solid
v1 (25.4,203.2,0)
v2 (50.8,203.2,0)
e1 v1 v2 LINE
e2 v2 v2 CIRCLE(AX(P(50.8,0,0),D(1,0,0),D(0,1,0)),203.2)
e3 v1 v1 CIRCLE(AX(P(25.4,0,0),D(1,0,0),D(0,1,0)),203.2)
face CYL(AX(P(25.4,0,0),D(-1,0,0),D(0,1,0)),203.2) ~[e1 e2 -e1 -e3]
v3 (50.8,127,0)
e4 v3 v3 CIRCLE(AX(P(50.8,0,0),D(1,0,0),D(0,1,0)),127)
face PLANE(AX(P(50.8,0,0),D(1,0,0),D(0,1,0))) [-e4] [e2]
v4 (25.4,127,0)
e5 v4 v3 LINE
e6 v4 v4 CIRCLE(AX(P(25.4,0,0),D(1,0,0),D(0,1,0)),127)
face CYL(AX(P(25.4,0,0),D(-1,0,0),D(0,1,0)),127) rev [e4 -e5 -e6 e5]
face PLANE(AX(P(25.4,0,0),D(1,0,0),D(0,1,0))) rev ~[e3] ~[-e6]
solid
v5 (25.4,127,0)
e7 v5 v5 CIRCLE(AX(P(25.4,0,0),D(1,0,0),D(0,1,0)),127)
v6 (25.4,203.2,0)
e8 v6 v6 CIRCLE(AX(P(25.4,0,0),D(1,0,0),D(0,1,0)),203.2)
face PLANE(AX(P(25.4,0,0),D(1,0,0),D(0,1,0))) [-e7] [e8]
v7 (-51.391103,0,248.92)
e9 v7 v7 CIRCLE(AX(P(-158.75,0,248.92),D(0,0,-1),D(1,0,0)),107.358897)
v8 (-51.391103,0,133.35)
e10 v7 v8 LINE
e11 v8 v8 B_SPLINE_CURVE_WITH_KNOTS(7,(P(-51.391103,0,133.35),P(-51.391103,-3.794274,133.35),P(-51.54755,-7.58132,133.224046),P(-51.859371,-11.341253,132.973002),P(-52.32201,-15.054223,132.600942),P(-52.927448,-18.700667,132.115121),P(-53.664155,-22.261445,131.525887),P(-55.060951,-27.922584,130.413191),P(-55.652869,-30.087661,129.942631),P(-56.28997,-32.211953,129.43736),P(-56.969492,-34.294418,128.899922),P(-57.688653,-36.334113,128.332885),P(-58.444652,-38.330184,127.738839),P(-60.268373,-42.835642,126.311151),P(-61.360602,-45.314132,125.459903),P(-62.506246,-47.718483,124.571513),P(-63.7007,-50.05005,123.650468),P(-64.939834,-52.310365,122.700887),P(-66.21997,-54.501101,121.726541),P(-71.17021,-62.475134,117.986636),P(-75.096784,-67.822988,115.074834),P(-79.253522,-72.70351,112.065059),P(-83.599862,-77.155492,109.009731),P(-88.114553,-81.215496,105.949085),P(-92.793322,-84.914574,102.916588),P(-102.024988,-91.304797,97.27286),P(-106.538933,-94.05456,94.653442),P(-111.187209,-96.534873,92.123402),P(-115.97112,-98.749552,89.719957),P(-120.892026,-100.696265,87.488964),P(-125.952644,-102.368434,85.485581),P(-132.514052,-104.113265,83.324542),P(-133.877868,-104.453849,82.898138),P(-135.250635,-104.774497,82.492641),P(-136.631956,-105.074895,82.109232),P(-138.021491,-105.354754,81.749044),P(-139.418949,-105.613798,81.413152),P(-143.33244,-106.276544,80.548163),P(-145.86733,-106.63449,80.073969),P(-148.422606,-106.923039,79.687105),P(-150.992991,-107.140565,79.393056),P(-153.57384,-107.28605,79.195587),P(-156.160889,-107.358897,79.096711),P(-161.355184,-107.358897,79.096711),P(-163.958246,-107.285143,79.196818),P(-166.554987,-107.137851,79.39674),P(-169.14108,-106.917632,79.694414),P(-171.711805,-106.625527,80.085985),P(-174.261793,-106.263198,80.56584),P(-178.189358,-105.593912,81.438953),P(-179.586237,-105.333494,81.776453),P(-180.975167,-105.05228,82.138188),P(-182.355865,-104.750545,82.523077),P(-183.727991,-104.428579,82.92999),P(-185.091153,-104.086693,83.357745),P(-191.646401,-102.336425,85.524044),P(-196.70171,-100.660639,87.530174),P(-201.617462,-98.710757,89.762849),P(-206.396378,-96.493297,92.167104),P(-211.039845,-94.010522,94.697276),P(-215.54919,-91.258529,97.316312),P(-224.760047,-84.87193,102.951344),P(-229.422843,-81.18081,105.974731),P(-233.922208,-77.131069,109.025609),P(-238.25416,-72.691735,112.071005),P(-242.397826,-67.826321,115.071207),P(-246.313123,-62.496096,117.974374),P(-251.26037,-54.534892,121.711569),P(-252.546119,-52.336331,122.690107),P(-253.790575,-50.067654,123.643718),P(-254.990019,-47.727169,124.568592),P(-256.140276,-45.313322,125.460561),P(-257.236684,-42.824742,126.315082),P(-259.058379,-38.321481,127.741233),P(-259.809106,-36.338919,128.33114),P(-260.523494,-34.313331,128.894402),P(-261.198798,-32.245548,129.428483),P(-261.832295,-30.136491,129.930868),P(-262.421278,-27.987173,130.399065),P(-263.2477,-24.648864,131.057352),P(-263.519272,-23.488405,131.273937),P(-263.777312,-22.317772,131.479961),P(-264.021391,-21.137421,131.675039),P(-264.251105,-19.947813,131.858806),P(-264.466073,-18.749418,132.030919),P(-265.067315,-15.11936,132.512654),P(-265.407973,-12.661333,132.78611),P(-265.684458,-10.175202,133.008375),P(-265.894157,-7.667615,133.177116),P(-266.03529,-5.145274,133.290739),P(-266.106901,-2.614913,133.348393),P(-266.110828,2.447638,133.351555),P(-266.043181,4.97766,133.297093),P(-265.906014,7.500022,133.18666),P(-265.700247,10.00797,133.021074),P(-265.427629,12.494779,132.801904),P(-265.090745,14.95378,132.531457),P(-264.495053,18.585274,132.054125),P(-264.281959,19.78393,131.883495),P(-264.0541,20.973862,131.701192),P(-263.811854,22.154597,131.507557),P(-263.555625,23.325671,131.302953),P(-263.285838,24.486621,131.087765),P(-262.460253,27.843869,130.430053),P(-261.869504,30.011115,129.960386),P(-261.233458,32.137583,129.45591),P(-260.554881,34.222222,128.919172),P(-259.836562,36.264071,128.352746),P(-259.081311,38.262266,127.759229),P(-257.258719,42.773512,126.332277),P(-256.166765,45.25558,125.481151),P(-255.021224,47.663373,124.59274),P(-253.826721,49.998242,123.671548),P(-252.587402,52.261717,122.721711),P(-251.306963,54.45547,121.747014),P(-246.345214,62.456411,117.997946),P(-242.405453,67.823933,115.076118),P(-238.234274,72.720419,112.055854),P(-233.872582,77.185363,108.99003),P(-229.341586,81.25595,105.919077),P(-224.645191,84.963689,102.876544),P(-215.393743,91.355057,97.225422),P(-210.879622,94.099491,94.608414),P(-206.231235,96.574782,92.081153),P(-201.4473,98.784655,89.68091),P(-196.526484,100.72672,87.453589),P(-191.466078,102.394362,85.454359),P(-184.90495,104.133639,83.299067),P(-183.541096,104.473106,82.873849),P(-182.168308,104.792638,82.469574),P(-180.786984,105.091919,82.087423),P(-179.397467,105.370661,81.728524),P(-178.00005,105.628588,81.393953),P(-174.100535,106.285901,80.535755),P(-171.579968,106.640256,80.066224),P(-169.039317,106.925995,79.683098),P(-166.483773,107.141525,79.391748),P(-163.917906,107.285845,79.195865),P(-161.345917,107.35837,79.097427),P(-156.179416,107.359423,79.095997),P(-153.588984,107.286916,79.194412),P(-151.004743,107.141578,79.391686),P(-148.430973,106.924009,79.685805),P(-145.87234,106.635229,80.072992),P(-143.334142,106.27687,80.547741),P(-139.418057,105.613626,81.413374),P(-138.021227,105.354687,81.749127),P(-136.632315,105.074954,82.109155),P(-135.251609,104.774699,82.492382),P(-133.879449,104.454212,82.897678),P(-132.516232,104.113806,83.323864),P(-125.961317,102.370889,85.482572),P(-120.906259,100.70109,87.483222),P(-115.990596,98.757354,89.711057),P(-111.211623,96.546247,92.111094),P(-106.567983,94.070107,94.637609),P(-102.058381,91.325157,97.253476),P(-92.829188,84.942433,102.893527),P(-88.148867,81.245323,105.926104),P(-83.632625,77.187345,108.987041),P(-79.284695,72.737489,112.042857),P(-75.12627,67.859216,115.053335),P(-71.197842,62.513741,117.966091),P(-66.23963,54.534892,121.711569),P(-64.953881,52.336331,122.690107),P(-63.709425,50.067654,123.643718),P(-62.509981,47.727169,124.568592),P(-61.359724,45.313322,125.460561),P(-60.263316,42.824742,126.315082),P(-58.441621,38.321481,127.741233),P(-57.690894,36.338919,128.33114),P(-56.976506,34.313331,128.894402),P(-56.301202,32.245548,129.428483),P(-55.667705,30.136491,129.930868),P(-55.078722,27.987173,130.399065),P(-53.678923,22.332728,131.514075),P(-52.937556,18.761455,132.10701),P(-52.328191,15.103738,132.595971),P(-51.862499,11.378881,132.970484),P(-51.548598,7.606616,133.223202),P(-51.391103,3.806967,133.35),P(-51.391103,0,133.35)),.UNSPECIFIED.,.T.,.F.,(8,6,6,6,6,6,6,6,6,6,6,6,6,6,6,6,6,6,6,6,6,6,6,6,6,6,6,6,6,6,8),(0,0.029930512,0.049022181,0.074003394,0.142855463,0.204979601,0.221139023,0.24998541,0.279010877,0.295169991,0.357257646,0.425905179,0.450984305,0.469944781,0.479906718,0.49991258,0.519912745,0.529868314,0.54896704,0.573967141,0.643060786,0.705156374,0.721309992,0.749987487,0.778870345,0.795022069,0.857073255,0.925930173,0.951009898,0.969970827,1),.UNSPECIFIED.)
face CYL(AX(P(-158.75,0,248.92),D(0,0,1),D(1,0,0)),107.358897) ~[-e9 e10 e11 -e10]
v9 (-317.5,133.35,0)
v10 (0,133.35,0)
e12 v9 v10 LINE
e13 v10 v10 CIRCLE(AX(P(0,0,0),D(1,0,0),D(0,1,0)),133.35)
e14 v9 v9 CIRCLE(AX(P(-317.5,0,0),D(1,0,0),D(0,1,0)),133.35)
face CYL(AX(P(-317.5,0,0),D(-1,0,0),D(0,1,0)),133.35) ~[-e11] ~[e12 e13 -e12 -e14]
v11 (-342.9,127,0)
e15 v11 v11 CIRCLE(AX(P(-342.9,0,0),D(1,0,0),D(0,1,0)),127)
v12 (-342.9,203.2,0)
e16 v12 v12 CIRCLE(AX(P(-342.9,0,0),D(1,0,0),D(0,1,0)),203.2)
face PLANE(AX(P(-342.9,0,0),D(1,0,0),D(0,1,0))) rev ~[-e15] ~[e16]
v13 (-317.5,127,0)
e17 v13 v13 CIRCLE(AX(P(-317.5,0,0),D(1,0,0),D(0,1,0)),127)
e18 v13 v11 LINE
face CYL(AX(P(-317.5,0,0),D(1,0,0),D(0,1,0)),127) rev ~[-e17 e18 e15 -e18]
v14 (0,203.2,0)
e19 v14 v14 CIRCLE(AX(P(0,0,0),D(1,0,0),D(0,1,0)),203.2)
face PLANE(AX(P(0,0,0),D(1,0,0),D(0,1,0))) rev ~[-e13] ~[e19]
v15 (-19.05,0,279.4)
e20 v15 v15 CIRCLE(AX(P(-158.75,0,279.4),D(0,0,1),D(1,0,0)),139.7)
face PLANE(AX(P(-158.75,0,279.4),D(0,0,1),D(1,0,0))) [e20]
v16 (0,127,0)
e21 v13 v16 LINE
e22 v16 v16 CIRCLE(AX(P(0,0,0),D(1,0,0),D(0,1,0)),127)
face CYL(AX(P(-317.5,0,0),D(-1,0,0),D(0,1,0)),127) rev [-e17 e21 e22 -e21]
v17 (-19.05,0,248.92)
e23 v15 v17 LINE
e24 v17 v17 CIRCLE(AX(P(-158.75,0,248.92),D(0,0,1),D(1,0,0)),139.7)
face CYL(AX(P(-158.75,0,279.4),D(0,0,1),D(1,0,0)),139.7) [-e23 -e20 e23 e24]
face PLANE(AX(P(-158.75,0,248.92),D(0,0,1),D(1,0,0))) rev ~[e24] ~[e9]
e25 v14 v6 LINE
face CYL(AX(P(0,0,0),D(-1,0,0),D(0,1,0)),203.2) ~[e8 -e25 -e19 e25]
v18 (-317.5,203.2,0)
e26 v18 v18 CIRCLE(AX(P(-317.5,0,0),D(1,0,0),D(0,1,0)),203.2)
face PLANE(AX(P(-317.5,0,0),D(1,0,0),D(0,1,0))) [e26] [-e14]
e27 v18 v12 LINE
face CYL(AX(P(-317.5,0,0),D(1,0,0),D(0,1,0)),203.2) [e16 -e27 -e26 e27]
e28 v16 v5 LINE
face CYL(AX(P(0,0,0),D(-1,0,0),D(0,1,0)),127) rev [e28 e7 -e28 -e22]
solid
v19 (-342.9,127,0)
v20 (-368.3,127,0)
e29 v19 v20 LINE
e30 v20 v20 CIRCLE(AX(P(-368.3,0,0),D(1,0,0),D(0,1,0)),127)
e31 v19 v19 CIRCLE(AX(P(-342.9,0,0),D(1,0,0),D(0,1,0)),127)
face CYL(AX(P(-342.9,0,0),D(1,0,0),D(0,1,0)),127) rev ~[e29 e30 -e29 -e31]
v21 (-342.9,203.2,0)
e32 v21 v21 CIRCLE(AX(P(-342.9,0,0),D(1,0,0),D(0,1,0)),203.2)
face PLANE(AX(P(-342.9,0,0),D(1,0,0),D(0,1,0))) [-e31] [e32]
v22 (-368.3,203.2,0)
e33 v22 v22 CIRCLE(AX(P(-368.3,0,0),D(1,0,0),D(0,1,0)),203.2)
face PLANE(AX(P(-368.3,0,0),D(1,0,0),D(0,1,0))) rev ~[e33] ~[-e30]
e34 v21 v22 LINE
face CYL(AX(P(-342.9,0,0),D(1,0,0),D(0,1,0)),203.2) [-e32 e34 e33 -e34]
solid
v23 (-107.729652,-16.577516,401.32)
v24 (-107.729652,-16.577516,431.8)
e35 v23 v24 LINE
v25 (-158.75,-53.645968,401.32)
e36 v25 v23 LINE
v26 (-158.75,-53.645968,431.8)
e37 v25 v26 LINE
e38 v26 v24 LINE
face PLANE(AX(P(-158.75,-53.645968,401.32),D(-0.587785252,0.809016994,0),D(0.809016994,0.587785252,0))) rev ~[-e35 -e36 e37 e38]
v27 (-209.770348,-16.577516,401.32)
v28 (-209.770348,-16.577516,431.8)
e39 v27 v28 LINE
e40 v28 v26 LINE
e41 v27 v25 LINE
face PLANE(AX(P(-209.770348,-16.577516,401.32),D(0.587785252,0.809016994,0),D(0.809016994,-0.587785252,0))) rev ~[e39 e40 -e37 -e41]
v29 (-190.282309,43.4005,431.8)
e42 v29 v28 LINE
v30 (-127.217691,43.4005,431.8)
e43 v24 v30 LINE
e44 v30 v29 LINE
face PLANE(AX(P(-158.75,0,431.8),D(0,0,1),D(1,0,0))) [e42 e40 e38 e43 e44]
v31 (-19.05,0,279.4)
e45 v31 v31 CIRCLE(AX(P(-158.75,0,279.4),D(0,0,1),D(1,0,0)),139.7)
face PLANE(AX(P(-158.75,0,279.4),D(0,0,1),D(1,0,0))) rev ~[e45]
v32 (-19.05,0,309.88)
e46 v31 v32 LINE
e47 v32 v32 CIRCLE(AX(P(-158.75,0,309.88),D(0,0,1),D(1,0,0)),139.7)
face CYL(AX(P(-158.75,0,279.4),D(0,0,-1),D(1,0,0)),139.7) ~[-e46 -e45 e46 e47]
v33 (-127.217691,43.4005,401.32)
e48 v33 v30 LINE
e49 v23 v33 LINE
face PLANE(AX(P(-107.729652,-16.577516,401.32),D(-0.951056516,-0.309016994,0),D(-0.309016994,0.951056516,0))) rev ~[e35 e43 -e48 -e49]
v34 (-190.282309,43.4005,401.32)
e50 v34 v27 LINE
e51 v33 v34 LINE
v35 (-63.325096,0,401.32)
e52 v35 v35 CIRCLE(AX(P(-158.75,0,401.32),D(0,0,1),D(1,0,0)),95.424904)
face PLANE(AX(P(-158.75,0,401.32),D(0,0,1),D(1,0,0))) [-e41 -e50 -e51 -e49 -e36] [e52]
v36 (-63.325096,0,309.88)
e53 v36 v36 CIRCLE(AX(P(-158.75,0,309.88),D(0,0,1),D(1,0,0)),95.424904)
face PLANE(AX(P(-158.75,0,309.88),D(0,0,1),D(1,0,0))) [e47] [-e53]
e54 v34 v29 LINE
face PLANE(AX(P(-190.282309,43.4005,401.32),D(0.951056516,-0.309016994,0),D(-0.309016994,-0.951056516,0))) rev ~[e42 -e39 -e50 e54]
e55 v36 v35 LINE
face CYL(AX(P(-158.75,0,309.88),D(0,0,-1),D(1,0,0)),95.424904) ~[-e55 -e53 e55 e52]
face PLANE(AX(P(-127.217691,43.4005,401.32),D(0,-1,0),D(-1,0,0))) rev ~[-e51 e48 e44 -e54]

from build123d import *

# Parameters (mm, degrees)
F0_R      = 203.2
F0_R_2    = 127
F1_DEPTH  = 25.4
F3_R      = 203.2
F3_R_2    = 127
F4_DEPTH  = 25.4
F6_DEPTH  = 25.4
F7_DEPTH  = 25.4
F9_R      = 133.35
F9_R_2    = 127
F10_DEPTH = 317.5
F12_R     = 139.7
F13_DEPTH = 30.48
F14_R     = 107.3588969204
F15_REACH = 755.7778161324
F16_DEPTH = 30.48
F17_R     = 95.4249040927
F18_DEPTH = 91.44
F20_DEPTH = 30.48


with BuildPart() as f1:
    # F0 (on Right) → F1 (new body)
    with BuildSketch(Plane.YZ):
        Circle(F0_R)
        Circle(F0_R_2, mode=Mode.SUBTRACT)
    extrude(amount=F1_DEPTH)


with BuildPart() as f4:
    # F3 (on offset) → F4 (new body)
    with BuildSketch(Plane.YZ.offset(-317.5)):
        Circle(F3_R)
        Circle(F3_R_2, mode=Mode.SUBTRACT)
    extrude(amount=-F4_DEPTH)


with BuildPart() as f6:
    # F6 (new): a face of the model
    f6_faces = [f4.part.faces().sort_by_distance(p)[0] for p in [
        (-342.9, -197.4526360825, 0),
    ]]
    extrude(f6_faces, amount=F6_DEPTH)


with BuildPart() as f7:
    # F7 (new): a face of the model
    f7_faces = [f1.part.faces().sort_by_distance(p)[0] for p in [
        (25.4, -197.4526360825, 0),
    ]]
    extrude(f7_faces, amount=F7_DEPTH)


with BuildPart() as f1_1:
    add(f1.part)

    add(f4.part)  # F10 merges F4
    # F9 (on face) → F10 (join, through all)
    with BuildSketch(Plane.YZ.offset(-317.5)):
        Circle(F9_R)
        Circle(F9_R_2, mode=Mode.SUBTRACT)
    extrude(amount=F10_DEPTH)



with BuildPart() as f13:
    # F12 (on offset) → F13 (new body)
    with BuildSketch(Plane.XY.offset(279.4)):
        with Locations((-158.75, 0)):
            Circle(F12_R)
    extrude(amount=-F13_DEPTH)


with BuildPart() as f1_2:
    add(f1_1.part)

    add(f13.part)  # F15 merges F13
    f15_end = f1_2.faces().sort_by_distance((-158.75, -133.35, 0))[0]
    # F14 (on face) → F15 (join, up to a face of the model that its end follows)
    with BuildSketch(Plane(origin=(0, 0, 248.92), x_dir=(1, 0, 0), z_dir=(0, 0, -1))):
        with Locations((-158.75, 0)):
            Circle(F14_R)
    f15_long = extrude(amount=F15_REACH, mode=Mode.PRIVATE)
    add(split(f15_long, bisect_by=f15_end, keep=Keep.ALL, mode=Mode.PRIVATE).solids().sort_by_distance((-158.75, 0, 248.92))[0])


with BuildPart() as f16:
    # F16 (new): a face of the model
    f16_faces = [f1_2.part.faces().sort_by_distance(p)[0] for p in [
        (-158.75, 0, 279.4),
    ]]
    extrude(f16_faces, amount=F16_DEPTH)

    # F17 (on face) → F18 (join)
    with BuildSketch(Plane.XY.offset(309.88)):
        with Locations((-158.75, 0)):
            Circle(F17_R)
    extrude(amount=F18_DEPTH)

    # F19 (on face) → F20 (join)
    with BuildSketch(Plane.XY.offset(401.32)):
        Polygon((-127.2176910353, 43.4004999697), (-190.2823089647, 43.4004999697), (-209.7703476486, -16.5775158597), (-158.75, -53.6459682201), (-107.7296523514, -16.5775158597), align=None)
    extrude(amount=F20_DEPTH)


solid = Compound([f6.part, f7.part, f1_2.part, f16.part])
